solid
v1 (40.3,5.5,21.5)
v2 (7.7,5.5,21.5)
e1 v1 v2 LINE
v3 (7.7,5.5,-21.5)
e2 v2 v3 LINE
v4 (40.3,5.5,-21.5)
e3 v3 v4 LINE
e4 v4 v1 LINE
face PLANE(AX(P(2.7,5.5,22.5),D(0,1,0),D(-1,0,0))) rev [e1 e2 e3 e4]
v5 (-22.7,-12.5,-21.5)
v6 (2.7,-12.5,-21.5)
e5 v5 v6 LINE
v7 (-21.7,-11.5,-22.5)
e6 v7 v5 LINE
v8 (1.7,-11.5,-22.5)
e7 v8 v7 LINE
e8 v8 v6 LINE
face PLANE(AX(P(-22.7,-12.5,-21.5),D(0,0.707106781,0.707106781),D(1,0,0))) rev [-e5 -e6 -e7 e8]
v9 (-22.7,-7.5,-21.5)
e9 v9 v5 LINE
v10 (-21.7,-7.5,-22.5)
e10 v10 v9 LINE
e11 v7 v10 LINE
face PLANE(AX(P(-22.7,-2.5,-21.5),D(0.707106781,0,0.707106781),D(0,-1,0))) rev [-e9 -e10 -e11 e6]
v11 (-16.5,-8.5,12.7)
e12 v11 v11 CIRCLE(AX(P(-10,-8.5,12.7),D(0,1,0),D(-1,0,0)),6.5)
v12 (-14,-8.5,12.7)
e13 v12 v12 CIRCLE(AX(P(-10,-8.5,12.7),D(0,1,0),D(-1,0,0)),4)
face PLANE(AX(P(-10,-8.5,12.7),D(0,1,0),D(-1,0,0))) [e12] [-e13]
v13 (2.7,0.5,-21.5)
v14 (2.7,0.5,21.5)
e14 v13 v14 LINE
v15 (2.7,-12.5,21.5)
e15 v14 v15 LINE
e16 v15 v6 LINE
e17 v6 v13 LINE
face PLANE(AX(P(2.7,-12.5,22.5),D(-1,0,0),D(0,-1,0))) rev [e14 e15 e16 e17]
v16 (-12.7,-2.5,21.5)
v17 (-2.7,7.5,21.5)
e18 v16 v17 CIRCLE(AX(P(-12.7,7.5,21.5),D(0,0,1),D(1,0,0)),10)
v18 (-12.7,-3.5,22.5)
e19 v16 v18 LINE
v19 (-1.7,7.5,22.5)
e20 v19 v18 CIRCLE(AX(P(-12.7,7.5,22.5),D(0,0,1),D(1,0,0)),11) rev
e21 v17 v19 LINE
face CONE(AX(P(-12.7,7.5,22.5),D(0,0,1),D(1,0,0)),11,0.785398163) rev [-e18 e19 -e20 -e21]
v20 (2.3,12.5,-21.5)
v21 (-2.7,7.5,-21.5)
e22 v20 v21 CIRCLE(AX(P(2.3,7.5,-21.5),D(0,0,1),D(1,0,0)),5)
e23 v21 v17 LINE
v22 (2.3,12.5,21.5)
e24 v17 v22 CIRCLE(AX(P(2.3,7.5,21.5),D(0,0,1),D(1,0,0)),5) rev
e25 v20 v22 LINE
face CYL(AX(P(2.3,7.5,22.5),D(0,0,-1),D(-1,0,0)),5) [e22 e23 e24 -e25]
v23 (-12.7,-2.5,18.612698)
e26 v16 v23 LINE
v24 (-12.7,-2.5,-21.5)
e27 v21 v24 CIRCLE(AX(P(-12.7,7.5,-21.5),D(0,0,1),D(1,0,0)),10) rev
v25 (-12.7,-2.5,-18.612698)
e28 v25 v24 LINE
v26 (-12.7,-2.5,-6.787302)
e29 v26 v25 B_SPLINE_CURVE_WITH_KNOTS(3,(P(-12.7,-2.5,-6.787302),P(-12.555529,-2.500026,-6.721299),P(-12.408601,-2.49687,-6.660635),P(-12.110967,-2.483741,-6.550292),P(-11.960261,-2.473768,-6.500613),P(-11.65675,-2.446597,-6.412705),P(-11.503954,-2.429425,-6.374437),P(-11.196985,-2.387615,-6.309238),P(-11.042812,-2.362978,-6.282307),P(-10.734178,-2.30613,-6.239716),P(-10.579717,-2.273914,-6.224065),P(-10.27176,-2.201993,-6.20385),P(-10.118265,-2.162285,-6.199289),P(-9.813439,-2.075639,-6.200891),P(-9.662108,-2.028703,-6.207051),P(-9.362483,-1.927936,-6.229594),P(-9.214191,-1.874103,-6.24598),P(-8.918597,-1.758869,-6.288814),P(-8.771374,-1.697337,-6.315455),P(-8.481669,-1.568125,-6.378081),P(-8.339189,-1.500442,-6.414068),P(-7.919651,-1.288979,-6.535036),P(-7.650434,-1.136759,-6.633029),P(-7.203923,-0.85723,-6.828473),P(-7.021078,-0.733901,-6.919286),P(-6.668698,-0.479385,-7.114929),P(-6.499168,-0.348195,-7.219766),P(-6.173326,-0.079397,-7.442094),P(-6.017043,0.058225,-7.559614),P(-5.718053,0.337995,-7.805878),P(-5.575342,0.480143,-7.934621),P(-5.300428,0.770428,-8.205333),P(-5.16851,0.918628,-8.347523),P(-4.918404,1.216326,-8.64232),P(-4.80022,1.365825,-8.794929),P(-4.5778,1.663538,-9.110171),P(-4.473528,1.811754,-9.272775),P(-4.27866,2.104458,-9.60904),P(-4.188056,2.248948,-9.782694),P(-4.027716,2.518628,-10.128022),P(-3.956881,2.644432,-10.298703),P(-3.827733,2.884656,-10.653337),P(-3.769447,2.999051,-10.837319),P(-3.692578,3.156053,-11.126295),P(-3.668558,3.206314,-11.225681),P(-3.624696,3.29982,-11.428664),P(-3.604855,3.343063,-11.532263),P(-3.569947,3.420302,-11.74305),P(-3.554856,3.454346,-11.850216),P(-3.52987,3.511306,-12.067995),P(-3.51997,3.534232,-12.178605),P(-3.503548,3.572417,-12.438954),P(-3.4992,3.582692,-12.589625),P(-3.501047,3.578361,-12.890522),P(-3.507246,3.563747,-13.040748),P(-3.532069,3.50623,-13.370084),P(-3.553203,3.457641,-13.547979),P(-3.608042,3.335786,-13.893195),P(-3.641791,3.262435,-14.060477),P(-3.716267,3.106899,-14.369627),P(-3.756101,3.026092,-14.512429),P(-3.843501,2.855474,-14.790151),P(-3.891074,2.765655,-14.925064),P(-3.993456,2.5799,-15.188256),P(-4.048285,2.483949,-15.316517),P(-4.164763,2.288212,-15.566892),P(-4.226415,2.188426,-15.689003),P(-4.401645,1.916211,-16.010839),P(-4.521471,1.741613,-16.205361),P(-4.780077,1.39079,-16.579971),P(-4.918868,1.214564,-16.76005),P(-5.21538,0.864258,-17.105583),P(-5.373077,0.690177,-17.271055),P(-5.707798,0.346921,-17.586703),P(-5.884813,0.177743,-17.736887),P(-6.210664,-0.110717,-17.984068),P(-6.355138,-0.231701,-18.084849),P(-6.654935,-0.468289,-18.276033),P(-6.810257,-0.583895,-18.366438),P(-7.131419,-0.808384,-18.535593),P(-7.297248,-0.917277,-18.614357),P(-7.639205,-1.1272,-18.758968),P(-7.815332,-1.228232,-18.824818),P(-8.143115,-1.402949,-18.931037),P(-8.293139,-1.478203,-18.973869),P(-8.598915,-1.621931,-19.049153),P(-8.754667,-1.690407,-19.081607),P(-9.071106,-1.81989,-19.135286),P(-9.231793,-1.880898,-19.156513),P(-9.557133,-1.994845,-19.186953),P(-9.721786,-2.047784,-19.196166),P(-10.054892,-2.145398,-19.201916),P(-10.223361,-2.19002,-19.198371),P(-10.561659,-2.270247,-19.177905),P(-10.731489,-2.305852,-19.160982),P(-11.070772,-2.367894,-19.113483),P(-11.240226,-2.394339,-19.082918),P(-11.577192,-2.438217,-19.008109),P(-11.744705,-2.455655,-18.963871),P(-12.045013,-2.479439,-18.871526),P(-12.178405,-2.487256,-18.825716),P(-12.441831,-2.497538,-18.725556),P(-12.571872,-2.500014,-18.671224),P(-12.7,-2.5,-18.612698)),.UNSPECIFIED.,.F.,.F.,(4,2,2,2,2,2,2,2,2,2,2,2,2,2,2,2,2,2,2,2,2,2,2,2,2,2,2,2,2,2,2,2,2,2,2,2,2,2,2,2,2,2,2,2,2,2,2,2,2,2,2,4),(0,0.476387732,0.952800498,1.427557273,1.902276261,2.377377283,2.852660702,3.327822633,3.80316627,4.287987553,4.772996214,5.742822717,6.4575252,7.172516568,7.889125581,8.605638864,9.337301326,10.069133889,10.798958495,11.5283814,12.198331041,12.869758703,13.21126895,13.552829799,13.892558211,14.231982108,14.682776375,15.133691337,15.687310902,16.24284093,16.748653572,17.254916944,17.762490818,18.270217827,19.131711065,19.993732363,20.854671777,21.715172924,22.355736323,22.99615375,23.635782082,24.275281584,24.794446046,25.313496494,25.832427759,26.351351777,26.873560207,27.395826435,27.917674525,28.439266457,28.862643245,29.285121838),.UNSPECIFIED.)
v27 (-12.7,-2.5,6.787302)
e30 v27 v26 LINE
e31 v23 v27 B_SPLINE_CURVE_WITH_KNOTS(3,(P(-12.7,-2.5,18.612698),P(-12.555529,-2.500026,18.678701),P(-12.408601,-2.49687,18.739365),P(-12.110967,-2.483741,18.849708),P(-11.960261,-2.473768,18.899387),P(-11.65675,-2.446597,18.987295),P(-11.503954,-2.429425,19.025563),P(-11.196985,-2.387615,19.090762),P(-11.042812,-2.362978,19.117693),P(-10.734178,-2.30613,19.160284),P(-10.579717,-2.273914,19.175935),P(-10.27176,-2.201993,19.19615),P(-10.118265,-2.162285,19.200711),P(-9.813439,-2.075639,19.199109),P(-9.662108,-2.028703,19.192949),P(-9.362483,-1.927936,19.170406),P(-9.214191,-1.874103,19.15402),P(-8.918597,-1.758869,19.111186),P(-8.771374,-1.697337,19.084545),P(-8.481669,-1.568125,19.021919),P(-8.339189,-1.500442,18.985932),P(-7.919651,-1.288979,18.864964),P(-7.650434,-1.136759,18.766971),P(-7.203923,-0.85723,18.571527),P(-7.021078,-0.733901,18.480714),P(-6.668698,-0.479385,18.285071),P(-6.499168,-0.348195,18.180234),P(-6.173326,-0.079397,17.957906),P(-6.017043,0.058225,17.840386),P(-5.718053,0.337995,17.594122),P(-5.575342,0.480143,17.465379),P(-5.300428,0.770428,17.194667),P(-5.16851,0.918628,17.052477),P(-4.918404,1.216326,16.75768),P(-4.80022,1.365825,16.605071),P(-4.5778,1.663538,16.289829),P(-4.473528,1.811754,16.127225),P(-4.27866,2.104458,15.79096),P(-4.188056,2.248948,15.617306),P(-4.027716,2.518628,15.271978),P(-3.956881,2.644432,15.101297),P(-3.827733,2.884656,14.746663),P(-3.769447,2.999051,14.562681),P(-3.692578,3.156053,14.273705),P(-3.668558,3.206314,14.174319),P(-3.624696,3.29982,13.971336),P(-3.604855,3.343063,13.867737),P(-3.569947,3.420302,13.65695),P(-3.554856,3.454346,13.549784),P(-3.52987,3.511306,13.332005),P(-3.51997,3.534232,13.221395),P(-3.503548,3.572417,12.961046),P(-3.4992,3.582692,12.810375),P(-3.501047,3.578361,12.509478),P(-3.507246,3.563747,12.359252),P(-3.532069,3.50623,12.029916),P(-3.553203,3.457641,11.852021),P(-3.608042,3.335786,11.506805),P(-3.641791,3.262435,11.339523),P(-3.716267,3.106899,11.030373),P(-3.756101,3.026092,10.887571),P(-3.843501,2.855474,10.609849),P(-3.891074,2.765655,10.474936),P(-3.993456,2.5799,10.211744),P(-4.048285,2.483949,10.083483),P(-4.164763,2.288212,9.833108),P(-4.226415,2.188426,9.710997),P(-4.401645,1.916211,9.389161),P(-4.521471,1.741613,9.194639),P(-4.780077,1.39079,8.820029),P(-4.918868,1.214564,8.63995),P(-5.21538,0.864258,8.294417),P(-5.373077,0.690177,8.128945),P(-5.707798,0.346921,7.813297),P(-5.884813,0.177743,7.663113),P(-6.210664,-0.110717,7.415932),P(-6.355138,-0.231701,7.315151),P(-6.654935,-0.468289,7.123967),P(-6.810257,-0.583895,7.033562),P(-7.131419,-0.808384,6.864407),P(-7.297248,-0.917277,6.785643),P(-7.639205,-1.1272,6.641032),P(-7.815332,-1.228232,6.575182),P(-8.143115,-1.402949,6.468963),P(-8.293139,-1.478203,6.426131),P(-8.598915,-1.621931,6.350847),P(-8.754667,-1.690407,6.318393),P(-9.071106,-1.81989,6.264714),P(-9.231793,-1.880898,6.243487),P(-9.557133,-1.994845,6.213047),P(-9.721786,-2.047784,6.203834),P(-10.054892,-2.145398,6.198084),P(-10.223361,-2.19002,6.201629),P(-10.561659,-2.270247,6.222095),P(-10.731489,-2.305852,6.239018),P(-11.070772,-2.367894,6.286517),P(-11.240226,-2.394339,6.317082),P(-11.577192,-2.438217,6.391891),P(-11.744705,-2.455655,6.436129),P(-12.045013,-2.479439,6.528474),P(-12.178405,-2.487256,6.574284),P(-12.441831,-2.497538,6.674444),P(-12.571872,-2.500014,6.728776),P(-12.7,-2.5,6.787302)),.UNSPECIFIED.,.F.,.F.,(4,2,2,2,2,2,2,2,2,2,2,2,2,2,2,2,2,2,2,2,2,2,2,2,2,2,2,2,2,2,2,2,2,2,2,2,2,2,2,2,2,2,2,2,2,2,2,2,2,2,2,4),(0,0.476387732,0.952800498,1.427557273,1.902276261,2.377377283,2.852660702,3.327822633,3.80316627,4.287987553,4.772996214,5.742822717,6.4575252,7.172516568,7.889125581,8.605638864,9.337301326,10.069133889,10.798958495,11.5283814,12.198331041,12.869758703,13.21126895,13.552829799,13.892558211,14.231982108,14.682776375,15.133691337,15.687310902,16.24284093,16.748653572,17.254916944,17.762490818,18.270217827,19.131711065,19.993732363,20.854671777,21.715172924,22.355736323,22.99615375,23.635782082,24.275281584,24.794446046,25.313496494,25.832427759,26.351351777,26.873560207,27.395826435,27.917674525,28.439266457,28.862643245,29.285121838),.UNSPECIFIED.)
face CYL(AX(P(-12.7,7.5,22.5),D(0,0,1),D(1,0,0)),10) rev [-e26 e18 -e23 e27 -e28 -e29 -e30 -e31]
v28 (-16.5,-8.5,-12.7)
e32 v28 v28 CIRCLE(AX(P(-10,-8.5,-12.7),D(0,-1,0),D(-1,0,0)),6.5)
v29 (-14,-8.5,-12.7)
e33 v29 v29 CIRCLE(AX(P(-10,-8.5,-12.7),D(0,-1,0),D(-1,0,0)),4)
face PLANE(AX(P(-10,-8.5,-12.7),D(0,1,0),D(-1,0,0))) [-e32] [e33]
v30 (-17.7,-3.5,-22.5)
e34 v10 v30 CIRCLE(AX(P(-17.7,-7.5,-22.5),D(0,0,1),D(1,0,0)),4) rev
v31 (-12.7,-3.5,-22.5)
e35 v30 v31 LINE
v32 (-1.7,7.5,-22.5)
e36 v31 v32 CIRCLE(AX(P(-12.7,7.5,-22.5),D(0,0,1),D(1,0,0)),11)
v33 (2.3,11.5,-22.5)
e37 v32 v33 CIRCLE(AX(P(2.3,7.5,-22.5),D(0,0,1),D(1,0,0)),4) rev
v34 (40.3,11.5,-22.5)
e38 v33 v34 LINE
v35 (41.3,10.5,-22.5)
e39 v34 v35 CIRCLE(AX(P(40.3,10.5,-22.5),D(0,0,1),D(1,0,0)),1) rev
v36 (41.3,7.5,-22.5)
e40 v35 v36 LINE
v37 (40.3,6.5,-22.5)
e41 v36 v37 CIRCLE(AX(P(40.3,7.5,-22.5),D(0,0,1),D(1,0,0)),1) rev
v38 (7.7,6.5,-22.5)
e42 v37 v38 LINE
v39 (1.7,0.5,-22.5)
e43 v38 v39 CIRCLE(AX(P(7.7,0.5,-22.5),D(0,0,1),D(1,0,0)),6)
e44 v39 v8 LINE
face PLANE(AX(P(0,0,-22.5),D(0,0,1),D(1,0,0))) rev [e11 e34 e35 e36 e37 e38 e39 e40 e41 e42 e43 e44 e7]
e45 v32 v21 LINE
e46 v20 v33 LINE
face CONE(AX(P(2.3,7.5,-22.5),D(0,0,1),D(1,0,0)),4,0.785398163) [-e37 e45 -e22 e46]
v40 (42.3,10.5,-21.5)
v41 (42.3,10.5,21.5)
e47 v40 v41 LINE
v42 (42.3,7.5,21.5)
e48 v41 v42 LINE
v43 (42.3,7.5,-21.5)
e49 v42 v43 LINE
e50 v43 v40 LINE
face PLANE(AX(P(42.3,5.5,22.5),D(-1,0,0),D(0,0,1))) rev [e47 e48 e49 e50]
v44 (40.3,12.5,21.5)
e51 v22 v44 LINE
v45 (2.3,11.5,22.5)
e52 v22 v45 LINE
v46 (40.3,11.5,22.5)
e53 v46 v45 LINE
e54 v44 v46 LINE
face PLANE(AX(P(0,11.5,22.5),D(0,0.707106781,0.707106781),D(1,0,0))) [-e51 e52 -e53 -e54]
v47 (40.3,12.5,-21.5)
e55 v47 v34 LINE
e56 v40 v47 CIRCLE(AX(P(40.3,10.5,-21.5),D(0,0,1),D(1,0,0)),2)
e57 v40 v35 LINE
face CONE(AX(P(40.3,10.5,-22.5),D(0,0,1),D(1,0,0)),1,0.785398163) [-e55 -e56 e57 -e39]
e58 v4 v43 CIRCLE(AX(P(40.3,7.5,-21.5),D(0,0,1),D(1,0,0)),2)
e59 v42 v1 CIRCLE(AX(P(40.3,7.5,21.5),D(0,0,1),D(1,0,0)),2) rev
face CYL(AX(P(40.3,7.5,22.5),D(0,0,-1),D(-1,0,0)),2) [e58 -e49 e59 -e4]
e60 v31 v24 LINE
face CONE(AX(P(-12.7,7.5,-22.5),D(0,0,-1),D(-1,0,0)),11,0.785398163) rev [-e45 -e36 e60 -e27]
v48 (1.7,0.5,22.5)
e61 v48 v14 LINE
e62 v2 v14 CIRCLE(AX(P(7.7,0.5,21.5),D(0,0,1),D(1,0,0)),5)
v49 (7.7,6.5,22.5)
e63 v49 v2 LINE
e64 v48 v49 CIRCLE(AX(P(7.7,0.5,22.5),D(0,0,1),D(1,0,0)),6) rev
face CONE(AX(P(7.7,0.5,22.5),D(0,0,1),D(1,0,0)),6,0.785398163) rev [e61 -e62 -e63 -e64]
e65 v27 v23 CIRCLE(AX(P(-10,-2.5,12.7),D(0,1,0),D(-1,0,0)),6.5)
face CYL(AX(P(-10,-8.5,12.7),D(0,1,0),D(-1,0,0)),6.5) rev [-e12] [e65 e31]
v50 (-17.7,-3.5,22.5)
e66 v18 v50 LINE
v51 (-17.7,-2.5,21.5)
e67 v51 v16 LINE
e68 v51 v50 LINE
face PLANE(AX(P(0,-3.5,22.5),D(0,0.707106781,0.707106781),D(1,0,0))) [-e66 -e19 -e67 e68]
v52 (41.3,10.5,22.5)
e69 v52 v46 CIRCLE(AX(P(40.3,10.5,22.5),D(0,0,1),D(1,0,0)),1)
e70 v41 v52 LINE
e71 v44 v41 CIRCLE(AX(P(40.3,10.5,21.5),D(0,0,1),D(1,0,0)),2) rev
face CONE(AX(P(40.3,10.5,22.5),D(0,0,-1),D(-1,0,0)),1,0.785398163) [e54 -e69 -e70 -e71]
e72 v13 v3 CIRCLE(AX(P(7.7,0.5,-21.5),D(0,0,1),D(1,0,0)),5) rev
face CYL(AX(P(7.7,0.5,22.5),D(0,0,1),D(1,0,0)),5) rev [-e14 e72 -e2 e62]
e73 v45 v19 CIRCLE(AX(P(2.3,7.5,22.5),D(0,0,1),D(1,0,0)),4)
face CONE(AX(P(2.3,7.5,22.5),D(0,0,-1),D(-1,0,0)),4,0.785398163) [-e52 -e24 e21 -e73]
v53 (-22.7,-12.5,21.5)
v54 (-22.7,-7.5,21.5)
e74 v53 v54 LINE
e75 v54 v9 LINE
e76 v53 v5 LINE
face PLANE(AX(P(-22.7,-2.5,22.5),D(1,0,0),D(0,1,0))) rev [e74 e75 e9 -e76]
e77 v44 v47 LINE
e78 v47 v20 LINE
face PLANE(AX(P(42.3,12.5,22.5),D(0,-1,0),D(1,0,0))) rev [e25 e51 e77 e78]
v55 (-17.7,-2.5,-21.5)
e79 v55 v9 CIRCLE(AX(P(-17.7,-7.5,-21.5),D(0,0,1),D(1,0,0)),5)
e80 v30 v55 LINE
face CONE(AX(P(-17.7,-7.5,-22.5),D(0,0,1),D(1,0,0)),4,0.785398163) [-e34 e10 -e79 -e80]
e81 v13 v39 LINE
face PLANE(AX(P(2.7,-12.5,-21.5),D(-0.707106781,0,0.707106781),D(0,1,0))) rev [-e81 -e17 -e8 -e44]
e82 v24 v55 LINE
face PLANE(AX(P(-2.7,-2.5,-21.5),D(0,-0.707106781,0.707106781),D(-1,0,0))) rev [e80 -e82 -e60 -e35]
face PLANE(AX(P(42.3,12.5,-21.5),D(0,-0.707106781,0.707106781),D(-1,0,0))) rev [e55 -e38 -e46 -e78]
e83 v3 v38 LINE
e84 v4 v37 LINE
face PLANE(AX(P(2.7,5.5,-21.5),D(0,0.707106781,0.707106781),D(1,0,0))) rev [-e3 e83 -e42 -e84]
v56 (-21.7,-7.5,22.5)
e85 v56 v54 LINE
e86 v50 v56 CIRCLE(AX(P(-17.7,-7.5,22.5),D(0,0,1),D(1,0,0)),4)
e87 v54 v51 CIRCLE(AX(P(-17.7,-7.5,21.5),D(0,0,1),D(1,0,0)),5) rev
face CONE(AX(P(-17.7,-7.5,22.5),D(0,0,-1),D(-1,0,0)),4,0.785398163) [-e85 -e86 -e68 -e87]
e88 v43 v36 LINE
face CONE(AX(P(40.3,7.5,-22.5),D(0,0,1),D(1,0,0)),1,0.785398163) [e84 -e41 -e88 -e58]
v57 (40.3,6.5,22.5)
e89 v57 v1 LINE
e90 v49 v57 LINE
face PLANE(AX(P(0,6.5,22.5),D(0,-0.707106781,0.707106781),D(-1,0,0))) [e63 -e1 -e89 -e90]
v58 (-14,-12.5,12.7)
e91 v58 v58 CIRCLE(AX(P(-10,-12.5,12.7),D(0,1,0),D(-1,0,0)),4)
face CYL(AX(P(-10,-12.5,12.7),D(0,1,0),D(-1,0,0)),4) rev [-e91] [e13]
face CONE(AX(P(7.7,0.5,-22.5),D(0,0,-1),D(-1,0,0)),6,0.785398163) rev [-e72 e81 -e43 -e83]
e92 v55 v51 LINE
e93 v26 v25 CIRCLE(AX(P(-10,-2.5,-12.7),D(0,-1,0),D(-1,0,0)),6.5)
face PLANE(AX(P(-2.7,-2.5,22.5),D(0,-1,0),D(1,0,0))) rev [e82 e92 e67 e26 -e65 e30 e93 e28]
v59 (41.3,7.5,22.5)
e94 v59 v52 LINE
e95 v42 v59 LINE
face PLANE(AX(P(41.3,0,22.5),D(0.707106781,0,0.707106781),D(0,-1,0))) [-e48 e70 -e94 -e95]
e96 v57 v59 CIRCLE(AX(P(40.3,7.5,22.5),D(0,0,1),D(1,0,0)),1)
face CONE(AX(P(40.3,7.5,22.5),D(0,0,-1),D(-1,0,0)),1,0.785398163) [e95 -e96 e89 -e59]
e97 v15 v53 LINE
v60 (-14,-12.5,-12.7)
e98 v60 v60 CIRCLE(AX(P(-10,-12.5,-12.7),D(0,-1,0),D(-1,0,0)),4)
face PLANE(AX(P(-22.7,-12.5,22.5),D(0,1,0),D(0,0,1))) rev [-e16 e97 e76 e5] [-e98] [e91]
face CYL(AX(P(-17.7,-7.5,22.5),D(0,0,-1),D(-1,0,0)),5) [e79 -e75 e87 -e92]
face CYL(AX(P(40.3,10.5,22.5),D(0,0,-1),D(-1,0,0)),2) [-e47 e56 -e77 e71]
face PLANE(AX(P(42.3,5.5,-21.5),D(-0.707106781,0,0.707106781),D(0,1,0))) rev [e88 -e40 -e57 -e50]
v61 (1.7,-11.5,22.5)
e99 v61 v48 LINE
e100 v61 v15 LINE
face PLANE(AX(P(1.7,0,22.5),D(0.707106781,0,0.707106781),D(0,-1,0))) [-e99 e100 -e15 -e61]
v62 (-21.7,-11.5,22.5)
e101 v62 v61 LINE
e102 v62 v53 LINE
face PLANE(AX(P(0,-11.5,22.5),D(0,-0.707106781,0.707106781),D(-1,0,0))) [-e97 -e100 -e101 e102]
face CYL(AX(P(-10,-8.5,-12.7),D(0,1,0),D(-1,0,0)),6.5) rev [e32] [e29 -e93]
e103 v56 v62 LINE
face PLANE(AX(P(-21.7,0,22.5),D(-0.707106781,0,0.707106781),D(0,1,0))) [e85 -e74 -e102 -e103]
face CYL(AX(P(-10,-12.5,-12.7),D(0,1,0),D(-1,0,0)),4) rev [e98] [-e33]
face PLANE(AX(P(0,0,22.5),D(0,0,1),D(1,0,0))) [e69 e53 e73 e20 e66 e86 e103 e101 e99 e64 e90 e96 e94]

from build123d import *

# Parameters (mm, degrees)
BOSS_EXTRUDE1_DEPTH = 22.5
SKETCH3_R           = 4
CUT_EXTRUDE1_DEPTH  = 51.204979833
SKETCH3_4_R         = 6.5
SKETCH3_4_R_2       = 4
CUT_EXTRUDE2_DEPTH  = 6
FILLET1_R           = 10
FILLET2_R           = 5
FILLET4_R           = 2
CHAMFER1_SIZE       = 1


# Some blends are built 0.0001 mm under size
with BuildPart() as part:
    # Sketch1 → Boss-Extrude1 (new, symmetric)
    with BuildSketch(Plane.XY):
        Polygon((-22.7, -12.5), (2.7, -12.5), (2.7, 5.5), (42.3, 5.5), (42.3, 12.5), (-2.7, 12.5), (-2.7, -2.5), (-22.7, -2.5), align=None)
    extrude(amount=BOSS_EXTRUDE1_DEPTH, both=True)

    # Sketch3 → Cut-Extrude1 (cut, through all)
    with BuildSketch(Plane(origin=(0, -2.5, 0), x_dir=(1, 0, 0), z_dir=(0, 1, 0))):
        with Locations(Location((-10, -12.7, 0), (0, 0, 180))):
            Circle(SKETCH3_R)
    cut_extrude1 = extrude(amount=-CUT_EXTRUDE1_DEPTH, mode=Mode.SUBTRACT)

    # Sketch3<4> → Cut-Extrude2 (cut)
    with BuildSketch(Plane(origin=(0, -2.5, 0), x_dir=(1, 0, 0), z_dir=(0, 1, 0))):
        with Locations(Location((-10, -12.7, 0), (0, 0, 180))):
            Circle(SKETCH3_4_R)
        with Locations(Location((-10, -12.7, 0), (0, 0, 180))):
            Circle(SKETCH3_4_R_2, mode=Mode.SUBTRACT)
    cut_extrude2 = extrude(amount=-CUT_EXTRUDE2_DEPTH, mode=Mode.SUBTRACT)

    # Mirror1: Cut-Extrude1, Cut-Extrude2 across plane
    add(cut_extrude1.mirror(Plane.XY), mode=Mode.SUBTRACT)
    add(cut_extrude2.mirror(Plane.XY), mode=Mode.SUBTRACT)

    # Fillet1
    # the kernel refuses this fillet: 10 mm, written as the material it adds along each edge
    with BuildSketch(Plane(origin=(-2.7, -2.5, 22.5), x_dir=(0, 1, 0), z_dir=(0, 0, -1))) as fillet1_piece_1_section:
        with BuildLine():
            CenterArc((FILLET1_R, -FILLET1_R), FILLET1_R, 90, 90)
            Line((0, -FILLET1_R), (0, 0))
            Line((0, 0), (FILLET1_R, 0))
        make_face()
    fillet1_piece_1 = extrude(amount=45, mode=Mode.PRIVATE)
    fillet1_piece_1 = fillet1_piece_1 - Plane(origin=(-10, 0.155378063, -12.7), x_dir=(-1, 0, 0), z_dir=(0, 1, 0)) * Cylinder(6.5, 130, mode=Mode.PRIVATE)
    fillet1_piece_1 = fillet1_piece_1 - Plane(origin=(-10, 0.155378063, 12.7), x_dir=(-1, 0, 0), z_dir=(0, 1, 0)) * Cylinder(6.5, 130, mode=Mode.PRIVATE)
    add(fillet1_piece_1)

    # Fillet2
    fillet2_edges = [part.edges().sort_by_distance(p)[0] for p in [
        (2.7, 5.5, 0),
        (-22.7, -2.5, 0),
        (-2.7, 12.5, 0),
    ]]
    fillet(fillet2_edges, radius=FILLET2_R - 0.0001)  # a hair under: the kernel refuses the full size

    # Fillet4
    fillet4_edges = [part.edges().sort_by_distance(p)[0] for p in [
        (42.3, 12.5, 0),
        (42.3, 5.5, 0),
    ]]
    fillet(fillet4_edges, radius=FILLET4_R)

    # Chamfer1
    chamfer1_edges = [part.edges().sort_by_distance(p)[0] for p in [
        (2.7, -5.99995, -22.5),
        (-10, -12.5, -22.5),
        (2.7, -5.99995, 22.5),
        (-15.20005, -2.5, -22.5),
        (-15.20005, -2.5, 22.5),
        (-5.628932188, 0.428932188, -22.5),
        (-5.628932188, 0.428932188, 22.5),
        (-22.7, -9.99995, -22.5),
        (-22.7, -9.99995, 22.5),
        (23.99995, 5.5, -22.5),
        (-1.235563195, 11.035563195, -22.5),
        (-21.235563195, -3.964436805, -22.5),
        (23.99995, 5.5, 22.5),
        (-1.235563195, 11.035563195, 22.5),
        (-21.235563195, -3.964436805, 22.5),
        (4.164436805, 4.035563195, -22.5),
        (4.164436805, 4.035563195, 22.5),
        (21.29995, 12.5, -22.5),
        (21.29995, 12.5, 22.5),
        (42.3, 9, -22.5),
        (41.714213562, 6.085786438, -22.5),
        (41.714213562, 11.914213562, -22.5),
        (42.3, 9, 22.5),
        (41.714213562, 6.085786438, 22.5),
        (41.714213562, 11.914213562, 22.5),
        (-10, -12.5, 22.5),
    ]]
    chamfer(chamfer1_edges, length=CHAMFER1_SIZE)


solid = part.part
